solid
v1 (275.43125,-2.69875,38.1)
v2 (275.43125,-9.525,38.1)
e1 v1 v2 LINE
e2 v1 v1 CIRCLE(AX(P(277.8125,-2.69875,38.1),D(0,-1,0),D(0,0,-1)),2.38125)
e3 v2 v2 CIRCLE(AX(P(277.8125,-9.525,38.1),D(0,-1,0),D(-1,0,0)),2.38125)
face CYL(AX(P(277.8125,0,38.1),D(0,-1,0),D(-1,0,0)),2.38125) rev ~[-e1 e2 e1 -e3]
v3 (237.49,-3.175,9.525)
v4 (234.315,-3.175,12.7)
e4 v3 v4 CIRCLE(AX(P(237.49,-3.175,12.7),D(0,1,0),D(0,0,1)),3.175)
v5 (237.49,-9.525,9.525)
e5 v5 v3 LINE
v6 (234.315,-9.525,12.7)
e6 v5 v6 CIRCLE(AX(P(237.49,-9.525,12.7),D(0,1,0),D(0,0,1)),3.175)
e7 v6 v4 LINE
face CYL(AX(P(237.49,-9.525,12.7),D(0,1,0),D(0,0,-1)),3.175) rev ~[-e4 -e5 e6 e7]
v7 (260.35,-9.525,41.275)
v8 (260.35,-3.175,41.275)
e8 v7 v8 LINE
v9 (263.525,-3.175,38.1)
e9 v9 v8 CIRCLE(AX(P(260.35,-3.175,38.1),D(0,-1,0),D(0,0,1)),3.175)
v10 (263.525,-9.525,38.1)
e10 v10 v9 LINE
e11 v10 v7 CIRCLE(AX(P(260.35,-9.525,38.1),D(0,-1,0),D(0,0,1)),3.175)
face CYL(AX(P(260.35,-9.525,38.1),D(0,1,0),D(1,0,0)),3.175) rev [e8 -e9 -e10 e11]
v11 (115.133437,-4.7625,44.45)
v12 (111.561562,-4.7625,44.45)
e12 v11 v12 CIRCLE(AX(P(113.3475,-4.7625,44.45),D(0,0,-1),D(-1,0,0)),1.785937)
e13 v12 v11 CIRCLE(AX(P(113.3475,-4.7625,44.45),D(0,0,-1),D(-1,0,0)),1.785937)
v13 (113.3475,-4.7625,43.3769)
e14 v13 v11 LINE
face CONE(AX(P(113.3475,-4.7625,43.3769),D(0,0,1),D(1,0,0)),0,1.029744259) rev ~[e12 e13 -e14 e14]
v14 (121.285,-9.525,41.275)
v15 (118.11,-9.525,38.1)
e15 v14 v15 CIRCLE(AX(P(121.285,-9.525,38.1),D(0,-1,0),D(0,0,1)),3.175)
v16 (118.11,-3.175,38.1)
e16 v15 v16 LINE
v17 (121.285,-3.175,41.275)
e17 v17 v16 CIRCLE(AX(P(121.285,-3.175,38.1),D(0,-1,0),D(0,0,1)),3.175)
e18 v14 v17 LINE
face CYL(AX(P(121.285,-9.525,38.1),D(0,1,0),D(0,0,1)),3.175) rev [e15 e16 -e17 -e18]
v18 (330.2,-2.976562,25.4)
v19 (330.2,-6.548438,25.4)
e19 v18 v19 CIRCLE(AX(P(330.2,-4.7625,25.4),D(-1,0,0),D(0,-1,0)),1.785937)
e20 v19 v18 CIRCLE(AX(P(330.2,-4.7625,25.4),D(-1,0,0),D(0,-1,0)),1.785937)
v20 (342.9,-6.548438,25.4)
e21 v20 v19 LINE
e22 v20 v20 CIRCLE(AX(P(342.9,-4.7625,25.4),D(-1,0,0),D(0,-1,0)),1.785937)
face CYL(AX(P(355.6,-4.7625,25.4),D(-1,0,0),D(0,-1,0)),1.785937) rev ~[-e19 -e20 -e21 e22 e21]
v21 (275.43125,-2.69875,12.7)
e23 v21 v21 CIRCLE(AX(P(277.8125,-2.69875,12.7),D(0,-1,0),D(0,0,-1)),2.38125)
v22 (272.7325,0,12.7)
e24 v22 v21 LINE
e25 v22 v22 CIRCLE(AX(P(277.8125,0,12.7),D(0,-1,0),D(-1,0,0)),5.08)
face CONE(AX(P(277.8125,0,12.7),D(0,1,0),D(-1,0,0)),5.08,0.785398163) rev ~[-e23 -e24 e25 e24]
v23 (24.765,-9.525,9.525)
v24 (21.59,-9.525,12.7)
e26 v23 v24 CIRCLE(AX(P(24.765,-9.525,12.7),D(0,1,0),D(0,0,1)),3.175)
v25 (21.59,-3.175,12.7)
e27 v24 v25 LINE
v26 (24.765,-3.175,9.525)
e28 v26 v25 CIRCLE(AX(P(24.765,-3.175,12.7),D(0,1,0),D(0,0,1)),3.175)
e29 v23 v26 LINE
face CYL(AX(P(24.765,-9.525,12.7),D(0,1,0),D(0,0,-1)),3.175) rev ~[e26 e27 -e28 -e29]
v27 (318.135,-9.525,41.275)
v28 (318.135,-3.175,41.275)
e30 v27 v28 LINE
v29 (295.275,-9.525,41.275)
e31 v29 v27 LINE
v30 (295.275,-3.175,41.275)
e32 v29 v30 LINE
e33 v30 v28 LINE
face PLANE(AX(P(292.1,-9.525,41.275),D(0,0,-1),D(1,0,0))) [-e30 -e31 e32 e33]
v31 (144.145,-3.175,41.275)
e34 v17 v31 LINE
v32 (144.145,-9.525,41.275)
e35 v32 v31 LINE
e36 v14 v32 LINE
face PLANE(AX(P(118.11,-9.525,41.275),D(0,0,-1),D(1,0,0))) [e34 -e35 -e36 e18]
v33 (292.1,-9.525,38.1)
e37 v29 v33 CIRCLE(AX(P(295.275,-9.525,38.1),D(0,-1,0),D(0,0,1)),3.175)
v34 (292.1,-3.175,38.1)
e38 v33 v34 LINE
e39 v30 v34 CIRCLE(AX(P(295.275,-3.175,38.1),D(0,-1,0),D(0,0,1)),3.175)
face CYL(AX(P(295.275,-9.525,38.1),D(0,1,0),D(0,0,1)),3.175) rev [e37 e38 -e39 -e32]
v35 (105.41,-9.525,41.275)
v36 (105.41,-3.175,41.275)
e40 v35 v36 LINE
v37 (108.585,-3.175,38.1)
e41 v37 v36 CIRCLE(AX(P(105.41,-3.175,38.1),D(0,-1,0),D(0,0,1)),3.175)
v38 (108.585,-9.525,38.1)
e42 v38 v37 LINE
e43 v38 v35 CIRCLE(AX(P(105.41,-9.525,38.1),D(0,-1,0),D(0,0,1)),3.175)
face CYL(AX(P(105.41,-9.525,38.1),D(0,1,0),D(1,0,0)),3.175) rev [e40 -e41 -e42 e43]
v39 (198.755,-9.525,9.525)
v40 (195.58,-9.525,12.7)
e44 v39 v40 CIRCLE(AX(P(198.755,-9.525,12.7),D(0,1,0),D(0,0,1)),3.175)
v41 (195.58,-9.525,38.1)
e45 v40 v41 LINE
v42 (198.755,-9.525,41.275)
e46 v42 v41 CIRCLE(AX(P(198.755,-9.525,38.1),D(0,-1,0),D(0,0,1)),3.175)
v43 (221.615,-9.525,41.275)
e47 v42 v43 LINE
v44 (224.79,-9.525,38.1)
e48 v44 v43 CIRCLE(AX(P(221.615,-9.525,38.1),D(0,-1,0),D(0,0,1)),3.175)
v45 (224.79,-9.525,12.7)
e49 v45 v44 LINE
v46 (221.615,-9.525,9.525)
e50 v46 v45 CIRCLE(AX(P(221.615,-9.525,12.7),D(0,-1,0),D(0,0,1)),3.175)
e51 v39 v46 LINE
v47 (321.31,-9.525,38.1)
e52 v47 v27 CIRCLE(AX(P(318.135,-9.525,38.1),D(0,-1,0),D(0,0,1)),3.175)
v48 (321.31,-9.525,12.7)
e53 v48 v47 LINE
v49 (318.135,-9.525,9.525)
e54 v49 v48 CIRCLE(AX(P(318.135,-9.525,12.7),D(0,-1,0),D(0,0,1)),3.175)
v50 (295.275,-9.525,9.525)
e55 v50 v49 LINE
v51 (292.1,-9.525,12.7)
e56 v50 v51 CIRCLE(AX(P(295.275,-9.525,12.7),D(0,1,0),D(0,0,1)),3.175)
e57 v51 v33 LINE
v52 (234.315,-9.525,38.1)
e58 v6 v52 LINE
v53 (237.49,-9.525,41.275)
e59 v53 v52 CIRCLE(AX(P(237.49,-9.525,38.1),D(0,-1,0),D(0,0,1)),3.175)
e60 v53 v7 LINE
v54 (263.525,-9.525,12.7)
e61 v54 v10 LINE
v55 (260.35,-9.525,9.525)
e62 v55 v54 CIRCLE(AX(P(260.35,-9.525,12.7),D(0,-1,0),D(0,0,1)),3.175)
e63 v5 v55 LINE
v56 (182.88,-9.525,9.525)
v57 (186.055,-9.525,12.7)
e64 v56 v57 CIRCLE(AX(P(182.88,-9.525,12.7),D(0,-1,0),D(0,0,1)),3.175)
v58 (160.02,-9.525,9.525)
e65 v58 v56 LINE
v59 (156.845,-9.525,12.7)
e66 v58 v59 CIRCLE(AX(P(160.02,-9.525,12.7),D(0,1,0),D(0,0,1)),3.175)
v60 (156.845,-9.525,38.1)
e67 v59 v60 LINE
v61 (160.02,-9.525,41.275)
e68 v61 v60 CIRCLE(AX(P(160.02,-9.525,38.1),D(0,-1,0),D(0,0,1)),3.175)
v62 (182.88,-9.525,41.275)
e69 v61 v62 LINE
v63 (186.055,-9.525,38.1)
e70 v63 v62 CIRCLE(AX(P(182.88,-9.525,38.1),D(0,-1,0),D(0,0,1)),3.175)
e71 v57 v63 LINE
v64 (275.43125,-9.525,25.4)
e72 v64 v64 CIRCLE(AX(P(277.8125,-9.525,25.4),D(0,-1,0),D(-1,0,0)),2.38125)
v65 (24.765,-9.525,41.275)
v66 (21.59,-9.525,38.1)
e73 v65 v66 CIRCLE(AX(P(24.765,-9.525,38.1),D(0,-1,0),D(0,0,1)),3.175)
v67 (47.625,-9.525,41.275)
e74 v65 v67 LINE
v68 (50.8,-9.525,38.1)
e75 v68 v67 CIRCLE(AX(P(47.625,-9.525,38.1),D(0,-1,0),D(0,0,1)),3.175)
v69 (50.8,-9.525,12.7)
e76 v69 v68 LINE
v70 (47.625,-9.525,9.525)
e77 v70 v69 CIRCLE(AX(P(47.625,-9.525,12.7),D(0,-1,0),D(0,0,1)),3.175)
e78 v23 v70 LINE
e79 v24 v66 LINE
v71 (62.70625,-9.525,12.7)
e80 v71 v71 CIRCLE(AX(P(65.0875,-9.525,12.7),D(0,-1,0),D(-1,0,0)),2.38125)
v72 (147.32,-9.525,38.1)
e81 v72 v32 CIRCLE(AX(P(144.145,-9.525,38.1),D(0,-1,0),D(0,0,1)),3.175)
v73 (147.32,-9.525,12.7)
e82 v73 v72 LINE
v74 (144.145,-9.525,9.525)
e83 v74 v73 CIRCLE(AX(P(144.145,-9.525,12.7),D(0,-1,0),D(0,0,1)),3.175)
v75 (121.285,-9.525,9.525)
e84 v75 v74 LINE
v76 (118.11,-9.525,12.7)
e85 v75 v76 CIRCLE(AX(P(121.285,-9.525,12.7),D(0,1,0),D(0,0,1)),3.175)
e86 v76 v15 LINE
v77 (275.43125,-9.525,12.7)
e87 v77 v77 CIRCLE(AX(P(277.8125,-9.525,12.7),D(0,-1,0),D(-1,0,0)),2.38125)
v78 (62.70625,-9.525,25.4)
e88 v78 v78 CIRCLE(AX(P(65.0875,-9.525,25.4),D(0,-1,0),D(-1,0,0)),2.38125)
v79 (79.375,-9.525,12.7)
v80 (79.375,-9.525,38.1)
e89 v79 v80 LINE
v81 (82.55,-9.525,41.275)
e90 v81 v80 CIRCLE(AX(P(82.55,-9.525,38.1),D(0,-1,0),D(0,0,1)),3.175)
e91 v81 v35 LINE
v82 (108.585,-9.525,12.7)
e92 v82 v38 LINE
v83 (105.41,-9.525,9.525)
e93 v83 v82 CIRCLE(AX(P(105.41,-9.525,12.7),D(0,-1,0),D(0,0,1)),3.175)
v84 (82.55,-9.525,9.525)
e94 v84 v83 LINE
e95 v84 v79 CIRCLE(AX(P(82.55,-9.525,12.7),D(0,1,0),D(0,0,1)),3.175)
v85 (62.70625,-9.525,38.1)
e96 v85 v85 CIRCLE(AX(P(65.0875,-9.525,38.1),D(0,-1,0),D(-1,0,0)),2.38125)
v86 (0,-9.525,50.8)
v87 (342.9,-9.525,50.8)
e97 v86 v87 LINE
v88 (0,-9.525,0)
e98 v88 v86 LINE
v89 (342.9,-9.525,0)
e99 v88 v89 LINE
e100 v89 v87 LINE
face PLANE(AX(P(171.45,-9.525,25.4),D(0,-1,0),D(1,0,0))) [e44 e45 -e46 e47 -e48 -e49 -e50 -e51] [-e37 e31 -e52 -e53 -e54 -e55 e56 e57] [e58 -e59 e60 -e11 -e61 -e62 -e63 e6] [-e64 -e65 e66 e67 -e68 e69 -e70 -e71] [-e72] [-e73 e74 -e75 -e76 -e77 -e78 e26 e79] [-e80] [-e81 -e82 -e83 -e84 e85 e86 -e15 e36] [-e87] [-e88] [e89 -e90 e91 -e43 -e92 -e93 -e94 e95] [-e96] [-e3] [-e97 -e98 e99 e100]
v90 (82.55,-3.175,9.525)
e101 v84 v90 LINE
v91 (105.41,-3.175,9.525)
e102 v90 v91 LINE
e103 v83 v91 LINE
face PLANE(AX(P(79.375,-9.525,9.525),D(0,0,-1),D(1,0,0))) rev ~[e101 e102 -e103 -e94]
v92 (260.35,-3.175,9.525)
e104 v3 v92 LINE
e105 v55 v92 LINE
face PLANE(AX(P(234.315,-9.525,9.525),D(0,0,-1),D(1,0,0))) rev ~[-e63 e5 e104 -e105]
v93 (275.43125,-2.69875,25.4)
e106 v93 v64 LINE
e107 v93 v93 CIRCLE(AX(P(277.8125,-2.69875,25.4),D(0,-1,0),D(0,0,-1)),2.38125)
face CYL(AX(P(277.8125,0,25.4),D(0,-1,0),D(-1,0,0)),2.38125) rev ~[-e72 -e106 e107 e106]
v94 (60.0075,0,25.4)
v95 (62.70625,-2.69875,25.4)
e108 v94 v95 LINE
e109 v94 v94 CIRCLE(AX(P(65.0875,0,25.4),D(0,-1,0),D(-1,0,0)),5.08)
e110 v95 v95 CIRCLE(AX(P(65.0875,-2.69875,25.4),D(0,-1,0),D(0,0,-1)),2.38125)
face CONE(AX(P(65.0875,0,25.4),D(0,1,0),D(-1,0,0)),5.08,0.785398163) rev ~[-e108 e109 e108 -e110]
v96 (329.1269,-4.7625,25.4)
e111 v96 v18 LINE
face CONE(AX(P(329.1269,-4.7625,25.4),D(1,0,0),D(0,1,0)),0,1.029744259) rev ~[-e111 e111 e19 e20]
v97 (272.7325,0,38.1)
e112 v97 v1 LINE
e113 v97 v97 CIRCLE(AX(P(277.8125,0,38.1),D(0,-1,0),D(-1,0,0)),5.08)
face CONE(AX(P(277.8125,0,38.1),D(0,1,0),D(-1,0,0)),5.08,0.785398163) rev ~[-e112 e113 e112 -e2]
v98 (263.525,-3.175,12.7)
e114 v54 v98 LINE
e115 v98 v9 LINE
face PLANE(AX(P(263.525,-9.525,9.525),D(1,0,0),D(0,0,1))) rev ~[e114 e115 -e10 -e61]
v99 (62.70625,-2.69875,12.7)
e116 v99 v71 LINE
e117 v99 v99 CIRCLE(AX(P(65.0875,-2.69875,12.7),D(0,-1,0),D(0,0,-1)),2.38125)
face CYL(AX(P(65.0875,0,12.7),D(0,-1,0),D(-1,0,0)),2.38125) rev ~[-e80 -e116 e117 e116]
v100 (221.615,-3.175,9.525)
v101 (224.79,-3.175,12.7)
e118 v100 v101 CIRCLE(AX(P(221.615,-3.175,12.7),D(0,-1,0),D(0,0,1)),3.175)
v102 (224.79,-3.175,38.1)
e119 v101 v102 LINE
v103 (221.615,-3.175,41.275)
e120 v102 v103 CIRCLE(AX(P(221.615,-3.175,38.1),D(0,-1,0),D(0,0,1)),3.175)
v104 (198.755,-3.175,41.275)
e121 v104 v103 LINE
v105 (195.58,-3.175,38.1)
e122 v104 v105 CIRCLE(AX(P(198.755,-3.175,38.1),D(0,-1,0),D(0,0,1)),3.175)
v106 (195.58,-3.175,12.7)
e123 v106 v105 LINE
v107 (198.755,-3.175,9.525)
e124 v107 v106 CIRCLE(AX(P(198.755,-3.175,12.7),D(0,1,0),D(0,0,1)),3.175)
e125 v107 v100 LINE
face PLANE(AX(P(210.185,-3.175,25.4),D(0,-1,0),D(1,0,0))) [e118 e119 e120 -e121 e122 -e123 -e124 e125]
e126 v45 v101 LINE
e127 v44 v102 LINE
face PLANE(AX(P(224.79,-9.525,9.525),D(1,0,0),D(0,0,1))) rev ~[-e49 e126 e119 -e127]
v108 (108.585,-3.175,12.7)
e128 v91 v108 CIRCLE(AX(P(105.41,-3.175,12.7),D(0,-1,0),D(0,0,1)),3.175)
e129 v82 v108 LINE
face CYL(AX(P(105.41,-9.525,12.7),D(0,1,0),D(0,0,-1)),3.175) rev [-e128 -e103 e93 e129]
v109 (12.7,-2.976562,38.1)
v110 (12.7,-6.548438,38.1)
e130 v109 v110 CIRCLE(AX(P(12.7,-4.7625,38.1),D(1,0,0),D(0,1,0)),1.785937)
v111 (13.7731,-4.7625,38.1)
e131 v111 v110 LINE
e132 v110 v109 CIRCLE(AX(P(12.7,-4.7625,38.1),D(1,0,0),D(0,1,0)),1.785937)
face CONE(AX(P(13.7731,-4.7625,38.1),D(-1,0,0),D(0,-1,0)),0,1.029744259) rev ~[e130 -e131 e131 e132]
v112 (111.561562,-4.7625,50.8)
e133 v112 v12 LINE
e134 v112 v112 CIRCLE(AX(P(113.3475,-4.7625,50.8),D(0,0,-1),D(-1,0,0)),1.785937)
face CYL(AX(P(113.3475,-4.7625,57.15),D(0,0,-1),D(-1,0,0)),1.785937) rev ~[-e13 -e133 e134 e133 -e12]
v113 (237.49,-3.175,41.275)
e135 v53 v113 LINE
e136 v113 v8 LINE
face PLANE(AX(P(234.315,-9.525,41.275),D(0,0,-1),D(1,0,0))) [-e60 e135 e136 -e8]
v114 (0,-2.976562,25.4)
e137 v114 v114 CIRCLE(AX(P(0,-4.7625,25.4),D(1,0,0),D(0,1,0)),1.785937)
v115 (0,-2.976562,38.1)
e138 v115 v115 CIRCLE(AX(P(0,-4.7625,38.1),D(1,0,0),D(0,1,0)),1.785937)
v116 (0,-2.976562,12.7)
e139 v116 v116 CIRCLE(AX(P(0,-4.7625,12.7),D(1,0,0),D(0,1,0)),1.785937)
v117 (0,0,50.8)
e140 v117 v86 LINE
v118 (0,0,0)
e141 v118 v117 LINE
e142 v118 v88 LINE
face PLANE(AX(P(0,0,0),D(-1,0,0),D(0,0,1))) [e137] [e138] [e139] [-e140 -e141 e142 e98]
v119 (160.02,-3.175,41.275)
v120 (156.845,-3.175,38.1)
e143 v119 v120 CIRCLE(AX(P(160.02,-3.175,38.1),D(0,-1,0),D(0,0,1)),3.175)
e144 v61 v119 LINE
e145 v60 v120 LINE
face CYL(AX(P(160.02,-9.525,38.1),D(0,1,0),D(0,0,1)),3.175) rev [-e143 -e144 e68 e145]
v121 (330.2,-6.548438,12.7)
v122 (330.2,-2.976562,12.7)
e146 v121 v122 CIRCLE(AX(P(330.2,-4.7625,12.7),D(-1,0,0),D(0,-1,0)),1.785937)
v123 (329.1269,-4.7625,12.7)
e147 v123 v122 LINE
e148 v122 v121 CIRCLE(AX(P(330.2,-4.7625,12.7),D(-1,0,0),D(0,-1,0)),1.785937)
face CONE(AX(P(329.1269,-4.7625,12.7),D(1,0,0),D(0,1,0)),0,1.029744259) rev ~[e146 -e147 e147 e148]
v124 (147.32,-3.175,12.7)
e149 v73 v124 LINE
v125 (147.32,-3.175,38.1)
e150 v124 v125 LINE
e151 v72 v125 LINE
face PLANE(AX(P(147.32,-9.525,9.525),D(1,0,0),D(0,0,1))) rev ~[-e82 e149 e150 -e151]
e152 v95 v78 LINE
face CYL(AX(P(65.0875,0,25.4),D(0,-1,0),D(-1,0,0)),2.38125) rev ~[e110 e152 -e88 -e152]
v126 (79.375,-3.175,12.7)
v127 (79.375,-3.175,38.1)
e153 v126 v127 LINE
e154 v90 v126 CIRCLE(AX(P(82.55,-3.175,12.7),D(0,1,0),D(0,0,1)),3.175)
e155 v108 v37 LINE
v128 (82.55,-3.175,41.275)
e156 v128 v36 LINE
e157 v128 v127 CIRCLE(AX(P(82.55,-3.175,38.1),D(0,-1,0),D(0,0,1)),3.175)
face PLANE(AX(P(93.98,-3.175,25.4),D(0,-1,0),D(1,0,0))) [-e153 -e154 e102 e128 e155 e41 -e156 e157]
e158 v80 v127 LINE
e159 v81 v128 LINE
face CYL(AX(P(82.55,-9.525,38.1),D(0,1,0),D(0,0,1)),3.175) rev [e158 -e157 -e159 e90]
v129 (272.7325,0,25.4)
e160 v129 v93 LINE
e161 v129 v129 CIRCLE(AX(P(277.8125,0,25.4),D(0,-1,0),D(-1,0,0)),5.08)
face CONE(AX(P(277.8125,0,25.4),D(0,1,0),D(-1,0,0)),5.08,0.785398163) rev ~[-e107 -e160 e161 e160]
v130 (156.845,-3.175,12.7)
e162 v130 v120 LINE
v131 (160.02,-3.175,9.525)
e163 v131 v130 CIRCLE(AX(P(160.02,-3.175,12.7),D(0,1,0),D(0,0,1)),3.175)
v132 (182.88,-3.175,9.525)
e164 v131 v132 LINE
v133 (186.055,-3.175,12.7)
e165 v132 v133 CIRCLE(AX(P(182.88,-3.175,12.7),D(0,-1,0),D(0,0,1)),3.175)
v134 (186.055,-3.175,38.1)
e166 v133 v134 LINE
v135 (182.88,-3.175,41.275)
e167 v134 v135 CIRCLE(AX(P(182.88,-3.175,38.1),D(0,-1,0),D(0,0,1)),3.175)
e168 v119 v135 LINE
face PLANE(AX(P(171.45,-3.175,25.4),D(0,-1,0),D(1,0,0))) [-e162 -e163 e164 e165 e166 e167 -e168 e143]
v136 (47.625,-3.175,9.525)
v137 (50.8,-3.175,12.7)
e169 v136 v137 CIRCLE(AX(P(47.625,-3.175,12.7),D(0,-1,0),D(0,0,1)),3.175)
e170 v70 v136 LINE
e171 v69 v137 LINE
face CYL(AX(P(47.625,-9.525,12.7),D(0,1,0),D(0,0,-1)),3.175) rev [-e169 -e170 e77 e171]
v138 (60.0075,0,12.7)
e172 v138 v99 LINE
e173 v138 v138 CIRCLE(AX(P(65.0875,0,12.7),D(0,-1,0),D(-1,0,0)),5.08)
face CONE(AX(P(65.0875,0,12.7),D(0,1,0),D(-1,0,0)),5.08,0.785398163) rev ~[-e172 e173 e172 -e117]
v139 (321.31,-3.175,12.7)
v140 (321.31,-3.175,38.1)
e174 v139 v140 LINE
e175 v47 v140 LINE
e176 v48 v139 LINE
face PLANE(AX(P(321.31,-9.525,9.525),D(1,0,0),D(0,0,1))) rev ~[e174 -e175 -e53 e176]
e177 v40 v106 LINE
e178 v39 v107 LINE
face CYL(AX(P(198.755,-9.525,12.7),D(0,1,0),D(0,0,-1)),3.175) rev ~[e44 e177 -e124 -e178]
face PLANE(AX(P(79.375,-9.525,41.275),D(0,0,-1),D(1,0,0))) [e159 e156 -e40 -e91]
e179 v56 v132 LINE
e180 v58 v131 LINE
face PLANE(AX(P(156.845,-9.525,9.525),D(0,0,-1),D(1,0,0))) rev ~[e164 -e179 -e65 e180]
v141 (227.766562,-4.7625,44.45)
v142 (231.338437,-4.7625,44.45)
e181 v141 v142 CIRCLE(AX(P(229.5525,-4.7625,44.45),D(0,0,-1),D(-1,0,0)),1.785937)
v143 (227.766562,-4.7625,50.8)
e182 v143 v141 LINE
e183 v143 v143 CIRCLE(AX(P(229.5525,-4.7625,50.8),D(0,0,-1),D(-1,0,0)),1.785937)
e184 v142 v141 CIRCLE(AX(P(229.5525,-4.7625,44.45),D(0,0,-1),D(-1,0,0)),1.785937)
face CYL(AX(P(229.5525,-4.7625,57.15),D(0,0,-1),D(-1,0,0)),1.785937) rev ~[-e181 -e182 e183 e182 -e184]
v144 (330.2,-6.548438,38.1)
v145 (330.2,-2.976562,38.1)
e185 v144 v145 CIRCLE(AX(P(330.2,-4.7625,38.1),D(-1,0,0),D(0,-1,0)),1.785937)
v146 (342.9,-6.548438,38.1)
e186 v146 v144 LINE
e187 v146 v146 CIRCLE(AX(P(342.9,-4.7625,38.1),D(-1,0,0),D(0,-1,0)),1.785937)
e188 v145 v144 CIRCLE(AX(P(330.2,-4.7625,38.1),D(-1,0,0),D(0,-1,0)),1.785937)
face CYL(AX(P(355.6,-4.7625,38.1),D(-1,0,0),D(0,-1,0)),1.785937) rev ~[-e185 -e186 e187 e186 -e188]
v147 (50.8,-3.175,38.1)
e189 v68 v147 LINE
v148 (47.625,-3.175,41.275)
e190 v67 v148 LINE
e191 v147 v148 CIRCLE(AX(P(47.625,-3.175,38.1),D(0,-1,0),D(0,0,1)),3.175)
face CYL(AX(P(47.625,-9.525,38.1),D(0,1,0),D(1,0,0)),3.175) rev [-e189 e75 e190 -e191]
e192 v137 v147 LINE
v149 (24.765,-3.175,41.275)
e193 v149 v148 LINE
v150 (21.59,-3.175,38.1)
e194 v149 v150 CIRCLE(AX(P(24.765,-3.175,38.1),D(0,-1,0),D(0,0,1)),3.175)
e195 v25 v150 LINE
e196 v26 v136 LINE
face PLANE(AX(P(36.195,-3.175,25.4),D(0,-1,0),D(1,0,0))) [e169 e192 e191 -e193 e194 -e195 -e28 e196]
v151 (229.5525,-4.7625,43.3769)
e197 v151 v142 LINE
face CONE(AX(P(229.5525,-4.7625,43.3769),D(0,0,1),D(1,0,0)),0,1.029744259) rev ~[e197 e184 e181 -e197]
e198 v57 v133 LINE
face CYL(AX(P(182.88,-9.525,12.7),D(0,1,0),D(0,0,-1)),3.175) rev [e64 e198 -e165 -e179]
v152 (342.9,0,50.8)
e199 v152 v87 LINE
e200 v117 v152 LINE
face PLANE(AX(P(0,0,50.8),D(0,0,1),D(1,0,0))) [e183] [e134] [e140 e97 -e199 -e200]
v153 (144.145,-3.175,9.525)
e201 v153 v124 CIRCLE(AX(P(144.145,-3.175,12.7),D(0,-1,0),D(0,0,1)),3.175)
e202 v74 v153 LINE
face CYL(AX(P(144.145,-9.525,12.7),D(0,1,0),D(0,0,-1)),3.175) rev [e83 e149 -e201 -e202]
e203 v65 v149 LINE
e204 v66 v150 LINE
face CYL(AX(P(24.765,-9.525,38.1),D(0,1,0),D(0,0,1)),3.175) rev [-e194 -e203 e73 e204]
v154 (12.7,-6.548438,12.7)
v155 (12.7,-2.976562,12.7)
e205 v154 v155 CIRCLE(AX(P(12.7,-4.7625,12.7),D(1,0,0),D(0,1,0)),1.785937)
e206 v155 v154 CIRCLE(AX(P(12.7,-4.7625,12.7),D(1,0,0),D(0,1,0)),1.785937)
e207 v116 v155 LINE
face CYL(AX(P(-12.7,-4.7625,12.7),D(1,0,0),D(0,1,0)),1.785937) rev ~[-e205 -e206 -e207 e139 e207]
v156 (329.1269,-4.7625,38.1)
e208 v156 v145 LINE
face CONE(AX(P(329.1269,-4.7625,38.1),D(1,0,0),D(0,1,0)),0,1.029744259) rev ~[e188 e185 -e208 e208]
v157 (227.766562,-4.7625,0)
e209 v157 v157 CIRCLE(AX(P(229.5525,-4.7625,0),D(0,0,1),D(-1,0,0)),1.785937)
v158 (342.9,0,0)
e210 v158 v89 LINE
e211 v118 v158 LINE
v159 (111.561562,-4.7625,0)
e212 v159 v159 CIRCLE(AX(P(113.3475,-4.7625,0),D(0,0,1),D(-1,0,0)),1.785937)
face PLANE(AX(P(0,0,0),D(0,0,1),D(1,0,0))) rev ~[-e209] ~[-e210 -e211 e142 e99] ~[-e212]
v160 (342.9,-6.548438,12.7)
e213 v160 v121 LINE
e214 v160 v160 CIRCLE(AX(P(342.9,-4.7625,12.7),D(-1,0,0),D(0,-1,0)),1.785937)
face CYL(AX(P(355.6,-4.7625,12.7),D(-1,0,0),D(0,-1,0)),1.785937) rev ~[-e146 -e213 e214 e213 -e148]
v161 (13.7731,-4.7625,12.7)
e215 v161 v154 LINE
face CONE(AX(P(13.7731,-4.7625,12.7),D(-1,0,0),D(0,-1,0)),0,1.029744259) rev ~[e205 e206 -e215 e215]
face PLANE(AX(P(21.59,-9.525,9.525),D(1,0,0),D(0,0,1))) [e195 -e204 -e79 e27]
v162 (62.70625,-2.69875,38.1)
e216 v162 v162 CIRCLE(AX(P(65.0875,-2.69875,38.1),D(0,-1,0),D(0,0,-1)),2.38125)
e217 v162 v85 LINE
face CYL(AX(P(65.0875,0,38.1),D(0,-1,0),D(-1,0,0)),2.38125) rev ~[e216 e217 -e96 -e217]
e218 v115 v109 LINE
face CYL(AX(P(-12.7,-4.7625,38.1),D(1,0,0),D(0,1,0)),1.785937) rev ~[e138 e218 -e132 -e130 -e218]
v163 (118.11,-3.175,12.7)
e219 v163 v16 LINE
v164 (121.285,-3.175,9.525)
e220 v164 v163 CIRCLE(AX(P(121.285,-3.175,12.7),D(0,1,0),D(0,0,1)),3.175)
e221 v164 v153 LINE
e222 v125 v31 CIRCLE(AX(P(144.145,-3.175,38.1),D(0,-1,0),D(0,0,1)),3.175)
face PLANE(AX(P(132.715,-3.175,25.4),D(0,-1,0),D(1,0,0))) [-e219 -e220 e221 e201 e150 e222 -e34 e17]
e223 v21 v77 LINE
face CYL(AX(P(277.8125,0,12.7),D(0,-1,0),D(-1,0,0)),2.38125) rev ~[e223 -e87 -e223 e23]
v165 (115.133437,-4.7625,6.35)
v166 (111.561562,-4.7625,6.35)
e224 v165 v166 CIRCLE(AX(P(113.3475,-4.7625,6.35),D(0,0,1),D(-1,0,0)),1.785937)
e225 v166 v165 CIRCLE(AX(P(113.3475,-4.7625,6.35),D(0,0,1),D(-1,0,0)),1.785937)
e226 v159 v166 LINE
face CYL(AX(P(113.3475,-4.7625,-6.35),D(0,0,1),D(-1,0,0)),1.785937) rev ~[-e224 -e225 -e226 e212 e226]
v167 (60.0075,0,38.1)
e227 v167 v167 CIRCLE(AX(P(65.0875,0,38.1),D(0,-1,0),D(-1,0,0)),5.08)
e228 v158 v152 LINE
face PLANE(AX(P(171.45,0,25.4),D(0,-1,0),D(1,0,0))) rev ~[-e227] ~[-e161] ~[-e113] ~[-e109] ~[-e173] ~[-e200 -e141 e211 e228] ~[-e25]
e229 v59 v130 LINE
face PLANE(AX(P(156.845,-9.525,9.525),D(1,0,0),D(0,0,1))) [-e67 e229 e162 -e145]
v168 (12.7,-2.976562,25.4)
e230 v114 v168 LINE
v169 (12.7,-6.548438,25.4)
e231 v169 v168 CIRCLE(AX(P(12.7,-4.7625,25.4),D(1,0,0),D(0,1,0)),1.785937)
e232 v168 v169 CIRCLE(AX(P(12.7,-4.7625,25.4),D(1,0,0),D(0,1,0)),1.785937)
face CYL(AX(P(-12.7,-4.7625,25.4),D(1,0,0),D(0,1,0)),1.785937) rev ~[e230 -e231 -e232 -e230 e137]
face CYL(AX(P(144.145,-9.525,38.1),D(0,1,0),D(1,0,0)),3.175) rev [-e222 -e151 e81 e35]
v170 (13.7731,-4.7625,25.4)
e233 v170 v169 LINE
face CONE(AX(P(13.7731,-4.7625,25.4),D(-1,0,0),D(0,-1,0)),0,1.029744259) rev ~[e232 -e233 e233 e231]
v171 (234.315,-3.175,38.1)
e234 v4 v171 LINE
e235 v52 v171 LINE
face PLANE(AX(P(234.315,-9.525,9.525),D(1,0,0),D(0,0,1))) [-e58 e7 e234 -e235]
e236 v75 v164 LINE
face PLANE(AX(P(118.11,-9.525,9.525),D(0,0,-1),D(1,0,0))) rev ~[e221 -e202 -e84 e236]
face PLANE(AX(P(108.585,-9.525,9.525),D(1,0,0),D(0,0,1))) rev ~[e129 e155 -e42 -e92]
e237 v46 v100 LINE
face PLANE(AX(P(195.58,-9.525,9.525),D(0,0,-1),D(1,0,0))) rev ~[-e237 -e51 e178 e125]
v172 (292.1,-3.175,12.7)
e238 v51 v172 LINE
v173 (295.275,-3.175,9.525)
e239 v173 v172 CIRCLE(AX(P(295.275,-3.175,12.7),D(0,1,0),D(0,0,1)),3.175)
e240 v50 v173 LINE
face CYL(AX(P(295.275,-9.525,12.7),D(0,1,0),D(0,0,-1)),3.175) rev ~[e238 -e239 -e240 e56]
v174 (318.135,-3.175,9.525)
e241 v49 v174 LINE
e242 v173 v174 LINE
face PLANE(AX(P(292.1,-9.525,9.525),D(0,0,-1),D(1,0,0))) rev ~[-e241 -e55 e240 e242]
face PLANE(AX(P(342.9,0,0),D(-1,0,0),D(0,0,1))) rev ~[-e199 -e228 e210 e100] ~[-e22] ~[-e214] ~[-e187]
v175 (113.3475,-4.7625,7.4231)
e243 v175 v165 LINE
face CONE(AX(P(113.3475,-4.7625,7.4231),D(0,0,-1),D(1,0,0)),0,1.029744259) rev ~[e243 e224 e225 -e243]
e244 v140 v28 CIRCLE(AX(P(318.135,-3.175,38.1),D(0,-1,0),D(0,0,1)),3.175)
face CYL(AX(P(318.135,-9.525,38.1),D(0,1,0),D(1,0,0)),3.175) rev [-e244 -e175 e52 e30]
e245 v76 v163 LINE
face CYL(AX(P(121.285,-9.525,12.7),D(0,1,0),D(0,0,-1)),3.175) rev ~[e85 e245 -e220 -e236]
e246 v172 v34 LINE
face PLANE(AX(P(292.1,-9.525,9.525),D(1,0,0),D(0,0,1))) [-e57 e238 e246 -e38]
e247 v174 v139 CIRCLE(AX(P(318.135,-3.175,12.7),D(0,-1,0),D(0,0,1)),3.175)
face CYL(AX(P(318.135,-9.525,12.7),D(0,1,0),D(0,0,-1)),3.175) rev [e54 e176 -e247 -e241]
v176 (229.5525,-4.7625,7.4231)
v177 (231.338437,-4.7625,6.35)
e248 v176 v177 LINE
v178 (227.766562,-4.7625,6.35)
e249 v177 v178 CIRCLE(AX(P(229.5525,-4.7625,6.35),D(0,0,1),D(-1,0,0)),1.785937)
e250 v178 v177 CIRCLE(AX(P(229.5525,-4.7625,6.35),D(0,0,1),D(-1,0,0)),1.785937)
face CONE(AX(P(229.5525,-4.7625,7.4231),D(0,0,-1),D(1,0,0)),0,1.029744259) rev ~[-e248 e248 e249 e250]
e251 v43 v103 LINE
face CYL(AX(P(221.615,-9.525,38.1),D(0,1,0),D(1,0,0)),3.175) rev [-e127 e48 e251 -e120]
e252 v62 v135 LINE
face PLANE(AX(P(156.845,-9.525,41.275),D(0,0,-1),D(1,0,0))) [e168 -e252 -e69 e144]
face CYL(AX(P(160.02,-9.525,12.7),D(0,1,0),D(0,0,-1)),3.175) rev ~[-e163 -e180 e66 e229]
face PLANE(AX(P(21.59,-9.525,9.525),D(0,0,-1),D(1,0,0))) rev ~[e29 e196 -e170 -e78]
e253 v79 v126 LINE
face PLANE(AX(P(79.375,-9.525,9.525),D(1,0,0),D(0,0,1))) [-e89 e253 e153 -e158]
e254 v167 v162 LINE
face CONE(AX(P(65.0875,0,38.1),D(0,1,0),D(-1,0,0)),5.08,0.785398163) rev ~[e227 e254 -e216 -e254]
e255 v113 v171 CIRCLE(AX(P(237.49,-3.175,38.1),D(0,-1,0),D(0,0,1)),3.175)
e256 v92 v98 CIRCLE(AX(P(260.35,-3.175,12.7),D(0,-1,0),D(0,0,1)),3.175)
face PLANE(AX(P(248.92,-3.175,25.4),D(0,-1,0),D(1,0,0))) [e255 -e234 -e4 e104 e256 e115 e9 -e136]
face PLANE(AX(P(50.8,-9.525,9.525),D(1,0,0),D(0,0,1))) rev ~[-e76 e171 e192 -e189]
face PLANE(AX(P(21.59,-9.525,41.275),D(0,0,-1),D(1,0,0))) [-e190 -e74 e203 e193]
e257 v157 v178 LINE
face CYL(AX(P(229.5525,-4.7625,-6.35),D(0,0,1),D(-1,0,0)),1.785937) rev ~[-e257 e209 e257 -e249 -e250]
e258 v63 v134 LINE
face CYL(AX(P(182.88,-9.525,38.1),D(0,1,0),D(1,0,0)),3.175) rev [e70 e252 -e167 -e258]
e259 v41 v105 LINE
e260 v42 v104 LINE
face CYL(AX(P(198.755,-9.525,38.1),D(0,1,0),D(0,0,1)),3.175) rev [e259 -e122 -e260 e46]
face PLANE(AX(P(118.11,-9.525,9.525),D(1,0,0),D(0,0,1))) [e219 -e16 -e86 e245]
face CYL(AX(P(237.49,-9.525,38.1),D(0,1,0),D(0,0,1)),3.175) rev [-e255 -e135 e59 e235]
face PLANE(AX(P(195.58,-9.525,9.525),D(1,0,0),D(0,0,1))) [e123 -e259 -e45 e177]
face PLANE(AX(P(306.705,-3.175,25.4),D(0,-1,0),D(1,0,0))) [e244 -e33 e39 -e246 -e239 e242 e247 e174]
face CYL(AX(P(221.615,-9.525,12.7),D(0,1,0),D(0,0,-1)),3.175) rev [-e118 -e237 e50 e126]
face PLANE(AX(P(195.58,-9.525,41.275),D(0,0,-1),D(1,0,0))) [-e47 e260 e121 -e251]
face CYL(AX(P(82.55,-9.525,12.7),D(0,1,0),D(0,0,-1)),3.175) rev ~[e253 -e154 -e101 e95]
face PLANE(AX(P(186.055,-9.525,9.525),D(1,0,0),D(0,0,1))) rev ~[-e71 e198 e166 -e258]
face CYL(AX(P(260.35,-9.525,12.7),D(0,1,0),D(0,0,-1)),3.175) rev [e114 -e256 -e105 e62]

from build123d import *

# Parameters (mm, degrees)
F0_W             = 342.9
F0_H             = 50.8
F1_DEPTH         = 9.525
F2_D             = 4.7625
F2_CSINK_D       = 10.16
F2_CSINK_ANGLE   = 90
F4_D             = 3.571875
F4_DEPTH         = 12.7
F4_TIP           = 1.0730995118
F6_D             = 3.571875
F6_DEPTH         = 12.7
F6_TIP           = 1.0730995118
F7_W             = 29.21
F7_H             = 31.75
F8_DEPTH         = 6.35
F9_R             = 3.175
F12_D            = 3.571875
F12_DEPTH        = 6.35
F12_TIP          = 1.0730995118
F12_ON_F10_D     = 3.571875
F12_ON_F10_DEPTH = 6.35
F12_ON_F10_TIP   = 1.0730995118


# Not quite as in the source:
# - a feature names something its author has since deleted; it is built from what else it names


with BuildPart() as f1:
    # F0 (on Front) → F1 (new body)
    with BuildSketch(Plane.XZ):
        with Locations((171.45, 25.4)):
            Rectangle(F0_W, F0_H)
    extrude(amount=F1_DEPTH)

    # F2 (through all)
    with Locations(Plane(origin=(0, 0, 0), x_dir=(1, 0, 0), z_dir=(0, 1, 0))):
        with Locations((65.0875, -38.1), (65.0875, -25.4), (65.0875, -12.7), (277.8125, -38.1), (277.8125, -25.4), (277.8125, -12.7)):
            CounterSinkHole(F2_D / 2, F2_CSINK_D / 2, counter_sink_angle=F2_CSINK_ANGLE)

    # F4
    with Locations(Plane(origin=(0, 0, 0), x_dir=(0, -1, 0), z_dir=(-1, 0, 0))):
        with Locations((4.7625, 25.4), (4.7625, 12.7), (4.7625, 38.1)):
            Hole(F4_D / 2, depth=F4_DEPTH)
            with Locations((0, 0, -(F4_DEPTH + F4_TIP / 2))):  # 118° drill point
                Cone(0, F4_D / 2, F4_TIP, mode=Mode.SUBTRACT)

    # F6
    with Locations(Plane.YZ.offset(342.9)):
        with Locations((-4.7625, 12.7), (-4.7625, 25.4), (-4.7625, 38.1)):
            Hole(F6_D / 2, depth=F6_DEPTH)
            with Locations((0, 0, -(F6_DEPTH + F6_TIP / 2))):  # 118° drill point
                Cone(0, F6_D / 2, F6_TIP, mode=Mode.SUBTRACT)

    # F7 (on face) → F8 (cut)
    with BuildSketch(Plane.XZ.offset(9.525)):
        with Locations((93.98, 25.4)):
            Rectangle(F7_W, F7_H)
        with Locations((132.715, 25.4)):
            Rectangle(F7_W, F7_H)
        with Locations((171.45, 25.4)):
            Rectangle(F7_W, F7_H)
        with Locations((210.185, 25.4)):
            Rectangle(F7_W, F7_H)
        with Locations((248.92, 25.4)):
            Rectangle(F7_W, F7_H)
        with Locations((36.195, 25.4)):
            Rectangle(F7_W, F7_H)
        with Locations((306.705, 25.4)):
            Rectangle(F7_W, F7_H)
    extrude(amount=-F8_DEPTH, mode=Mode.SUBTRACT)

    # F9
    f9_edges = [f1.edges().sort_by_distance(p)[0] for p in [
        (156.845, -6.35, 41.275),
        (195.58, -6.35, 41.275),
        (234.315, -6.35, 41.275),
        (79.375, -6.35, 41.275),
        (118.11, -6.35, 41.275),
        (79.375, -6.35, 9.525),
        (118.11, -6.35, 9.525),
        (156.845, -6.35, 9.525),
        (195.58, -6.35, 9.525),
        (234.315, -6.35, 9.525),
        (108.585, -6.35, 41.275),
        (147.32, -6.35, 41.275),
        (186.055, -6.35, 41.275),
        (224.79, -6.35, 41.275),
        (263.525, -6.35, 41.275),
        (263.525, -6.35, 9.525),
        (224.79, -6.35, 9.525),
        (186.055, -6.35, 9.525),
        (147.32, -6.35, 9.525),
        (108.585, -6.35, 9.525),
        (321.31, -6.35, 41.275),
        (292.1, -6.35, 41.275),
        (292.1, -6.35, 9.525),
        (321.31, -6.35, 9.525),
        (50.8, -6.35, 9.525),
        (50.8, -6.35, 41.275),
        (21.59, -6.35, 41.275),
        (21.59, -6.35, 9.525),
    ]]
    fillet(f9_edges, radius=F9_R)

    # F12
    with Locations(Plane.XY.offset(50.8)):
        with Locations((229.5525, -4.7625), (113.3475, -4.7625)):
            Hole(F12_D / 2, depth=F12_DEPTH)
            with Locations((0, 0, -(F12_DEPTH + F12_TIP / 2))):  # 118° drill point
                Cone(0, F12_D / 2, F12_TIP, mode=Mode.SUBTRACT)

    # F12 on F10
    with Locations(Plane(origin=(0, 0, 0), x_dir=(1, 0, 0), z_dir=(0, 0, -1))):
        with Locations((113.3475, 4.7625), (229.5525, 4.7625)):
            Hole(F12_ON_F10_D / 2, depth=F12_ON_F10_DEPTH)
            with Locations((0, 0, -(F12_ON_F10_DEPTH + F12_ON_F10_TIP / 2))):  # 118° drill point
                Cone(0, F12_ON_F10_D / 2, F12_ON_F10_TIP, mode=Mode.SUBTRACT)


solid = f1.part
